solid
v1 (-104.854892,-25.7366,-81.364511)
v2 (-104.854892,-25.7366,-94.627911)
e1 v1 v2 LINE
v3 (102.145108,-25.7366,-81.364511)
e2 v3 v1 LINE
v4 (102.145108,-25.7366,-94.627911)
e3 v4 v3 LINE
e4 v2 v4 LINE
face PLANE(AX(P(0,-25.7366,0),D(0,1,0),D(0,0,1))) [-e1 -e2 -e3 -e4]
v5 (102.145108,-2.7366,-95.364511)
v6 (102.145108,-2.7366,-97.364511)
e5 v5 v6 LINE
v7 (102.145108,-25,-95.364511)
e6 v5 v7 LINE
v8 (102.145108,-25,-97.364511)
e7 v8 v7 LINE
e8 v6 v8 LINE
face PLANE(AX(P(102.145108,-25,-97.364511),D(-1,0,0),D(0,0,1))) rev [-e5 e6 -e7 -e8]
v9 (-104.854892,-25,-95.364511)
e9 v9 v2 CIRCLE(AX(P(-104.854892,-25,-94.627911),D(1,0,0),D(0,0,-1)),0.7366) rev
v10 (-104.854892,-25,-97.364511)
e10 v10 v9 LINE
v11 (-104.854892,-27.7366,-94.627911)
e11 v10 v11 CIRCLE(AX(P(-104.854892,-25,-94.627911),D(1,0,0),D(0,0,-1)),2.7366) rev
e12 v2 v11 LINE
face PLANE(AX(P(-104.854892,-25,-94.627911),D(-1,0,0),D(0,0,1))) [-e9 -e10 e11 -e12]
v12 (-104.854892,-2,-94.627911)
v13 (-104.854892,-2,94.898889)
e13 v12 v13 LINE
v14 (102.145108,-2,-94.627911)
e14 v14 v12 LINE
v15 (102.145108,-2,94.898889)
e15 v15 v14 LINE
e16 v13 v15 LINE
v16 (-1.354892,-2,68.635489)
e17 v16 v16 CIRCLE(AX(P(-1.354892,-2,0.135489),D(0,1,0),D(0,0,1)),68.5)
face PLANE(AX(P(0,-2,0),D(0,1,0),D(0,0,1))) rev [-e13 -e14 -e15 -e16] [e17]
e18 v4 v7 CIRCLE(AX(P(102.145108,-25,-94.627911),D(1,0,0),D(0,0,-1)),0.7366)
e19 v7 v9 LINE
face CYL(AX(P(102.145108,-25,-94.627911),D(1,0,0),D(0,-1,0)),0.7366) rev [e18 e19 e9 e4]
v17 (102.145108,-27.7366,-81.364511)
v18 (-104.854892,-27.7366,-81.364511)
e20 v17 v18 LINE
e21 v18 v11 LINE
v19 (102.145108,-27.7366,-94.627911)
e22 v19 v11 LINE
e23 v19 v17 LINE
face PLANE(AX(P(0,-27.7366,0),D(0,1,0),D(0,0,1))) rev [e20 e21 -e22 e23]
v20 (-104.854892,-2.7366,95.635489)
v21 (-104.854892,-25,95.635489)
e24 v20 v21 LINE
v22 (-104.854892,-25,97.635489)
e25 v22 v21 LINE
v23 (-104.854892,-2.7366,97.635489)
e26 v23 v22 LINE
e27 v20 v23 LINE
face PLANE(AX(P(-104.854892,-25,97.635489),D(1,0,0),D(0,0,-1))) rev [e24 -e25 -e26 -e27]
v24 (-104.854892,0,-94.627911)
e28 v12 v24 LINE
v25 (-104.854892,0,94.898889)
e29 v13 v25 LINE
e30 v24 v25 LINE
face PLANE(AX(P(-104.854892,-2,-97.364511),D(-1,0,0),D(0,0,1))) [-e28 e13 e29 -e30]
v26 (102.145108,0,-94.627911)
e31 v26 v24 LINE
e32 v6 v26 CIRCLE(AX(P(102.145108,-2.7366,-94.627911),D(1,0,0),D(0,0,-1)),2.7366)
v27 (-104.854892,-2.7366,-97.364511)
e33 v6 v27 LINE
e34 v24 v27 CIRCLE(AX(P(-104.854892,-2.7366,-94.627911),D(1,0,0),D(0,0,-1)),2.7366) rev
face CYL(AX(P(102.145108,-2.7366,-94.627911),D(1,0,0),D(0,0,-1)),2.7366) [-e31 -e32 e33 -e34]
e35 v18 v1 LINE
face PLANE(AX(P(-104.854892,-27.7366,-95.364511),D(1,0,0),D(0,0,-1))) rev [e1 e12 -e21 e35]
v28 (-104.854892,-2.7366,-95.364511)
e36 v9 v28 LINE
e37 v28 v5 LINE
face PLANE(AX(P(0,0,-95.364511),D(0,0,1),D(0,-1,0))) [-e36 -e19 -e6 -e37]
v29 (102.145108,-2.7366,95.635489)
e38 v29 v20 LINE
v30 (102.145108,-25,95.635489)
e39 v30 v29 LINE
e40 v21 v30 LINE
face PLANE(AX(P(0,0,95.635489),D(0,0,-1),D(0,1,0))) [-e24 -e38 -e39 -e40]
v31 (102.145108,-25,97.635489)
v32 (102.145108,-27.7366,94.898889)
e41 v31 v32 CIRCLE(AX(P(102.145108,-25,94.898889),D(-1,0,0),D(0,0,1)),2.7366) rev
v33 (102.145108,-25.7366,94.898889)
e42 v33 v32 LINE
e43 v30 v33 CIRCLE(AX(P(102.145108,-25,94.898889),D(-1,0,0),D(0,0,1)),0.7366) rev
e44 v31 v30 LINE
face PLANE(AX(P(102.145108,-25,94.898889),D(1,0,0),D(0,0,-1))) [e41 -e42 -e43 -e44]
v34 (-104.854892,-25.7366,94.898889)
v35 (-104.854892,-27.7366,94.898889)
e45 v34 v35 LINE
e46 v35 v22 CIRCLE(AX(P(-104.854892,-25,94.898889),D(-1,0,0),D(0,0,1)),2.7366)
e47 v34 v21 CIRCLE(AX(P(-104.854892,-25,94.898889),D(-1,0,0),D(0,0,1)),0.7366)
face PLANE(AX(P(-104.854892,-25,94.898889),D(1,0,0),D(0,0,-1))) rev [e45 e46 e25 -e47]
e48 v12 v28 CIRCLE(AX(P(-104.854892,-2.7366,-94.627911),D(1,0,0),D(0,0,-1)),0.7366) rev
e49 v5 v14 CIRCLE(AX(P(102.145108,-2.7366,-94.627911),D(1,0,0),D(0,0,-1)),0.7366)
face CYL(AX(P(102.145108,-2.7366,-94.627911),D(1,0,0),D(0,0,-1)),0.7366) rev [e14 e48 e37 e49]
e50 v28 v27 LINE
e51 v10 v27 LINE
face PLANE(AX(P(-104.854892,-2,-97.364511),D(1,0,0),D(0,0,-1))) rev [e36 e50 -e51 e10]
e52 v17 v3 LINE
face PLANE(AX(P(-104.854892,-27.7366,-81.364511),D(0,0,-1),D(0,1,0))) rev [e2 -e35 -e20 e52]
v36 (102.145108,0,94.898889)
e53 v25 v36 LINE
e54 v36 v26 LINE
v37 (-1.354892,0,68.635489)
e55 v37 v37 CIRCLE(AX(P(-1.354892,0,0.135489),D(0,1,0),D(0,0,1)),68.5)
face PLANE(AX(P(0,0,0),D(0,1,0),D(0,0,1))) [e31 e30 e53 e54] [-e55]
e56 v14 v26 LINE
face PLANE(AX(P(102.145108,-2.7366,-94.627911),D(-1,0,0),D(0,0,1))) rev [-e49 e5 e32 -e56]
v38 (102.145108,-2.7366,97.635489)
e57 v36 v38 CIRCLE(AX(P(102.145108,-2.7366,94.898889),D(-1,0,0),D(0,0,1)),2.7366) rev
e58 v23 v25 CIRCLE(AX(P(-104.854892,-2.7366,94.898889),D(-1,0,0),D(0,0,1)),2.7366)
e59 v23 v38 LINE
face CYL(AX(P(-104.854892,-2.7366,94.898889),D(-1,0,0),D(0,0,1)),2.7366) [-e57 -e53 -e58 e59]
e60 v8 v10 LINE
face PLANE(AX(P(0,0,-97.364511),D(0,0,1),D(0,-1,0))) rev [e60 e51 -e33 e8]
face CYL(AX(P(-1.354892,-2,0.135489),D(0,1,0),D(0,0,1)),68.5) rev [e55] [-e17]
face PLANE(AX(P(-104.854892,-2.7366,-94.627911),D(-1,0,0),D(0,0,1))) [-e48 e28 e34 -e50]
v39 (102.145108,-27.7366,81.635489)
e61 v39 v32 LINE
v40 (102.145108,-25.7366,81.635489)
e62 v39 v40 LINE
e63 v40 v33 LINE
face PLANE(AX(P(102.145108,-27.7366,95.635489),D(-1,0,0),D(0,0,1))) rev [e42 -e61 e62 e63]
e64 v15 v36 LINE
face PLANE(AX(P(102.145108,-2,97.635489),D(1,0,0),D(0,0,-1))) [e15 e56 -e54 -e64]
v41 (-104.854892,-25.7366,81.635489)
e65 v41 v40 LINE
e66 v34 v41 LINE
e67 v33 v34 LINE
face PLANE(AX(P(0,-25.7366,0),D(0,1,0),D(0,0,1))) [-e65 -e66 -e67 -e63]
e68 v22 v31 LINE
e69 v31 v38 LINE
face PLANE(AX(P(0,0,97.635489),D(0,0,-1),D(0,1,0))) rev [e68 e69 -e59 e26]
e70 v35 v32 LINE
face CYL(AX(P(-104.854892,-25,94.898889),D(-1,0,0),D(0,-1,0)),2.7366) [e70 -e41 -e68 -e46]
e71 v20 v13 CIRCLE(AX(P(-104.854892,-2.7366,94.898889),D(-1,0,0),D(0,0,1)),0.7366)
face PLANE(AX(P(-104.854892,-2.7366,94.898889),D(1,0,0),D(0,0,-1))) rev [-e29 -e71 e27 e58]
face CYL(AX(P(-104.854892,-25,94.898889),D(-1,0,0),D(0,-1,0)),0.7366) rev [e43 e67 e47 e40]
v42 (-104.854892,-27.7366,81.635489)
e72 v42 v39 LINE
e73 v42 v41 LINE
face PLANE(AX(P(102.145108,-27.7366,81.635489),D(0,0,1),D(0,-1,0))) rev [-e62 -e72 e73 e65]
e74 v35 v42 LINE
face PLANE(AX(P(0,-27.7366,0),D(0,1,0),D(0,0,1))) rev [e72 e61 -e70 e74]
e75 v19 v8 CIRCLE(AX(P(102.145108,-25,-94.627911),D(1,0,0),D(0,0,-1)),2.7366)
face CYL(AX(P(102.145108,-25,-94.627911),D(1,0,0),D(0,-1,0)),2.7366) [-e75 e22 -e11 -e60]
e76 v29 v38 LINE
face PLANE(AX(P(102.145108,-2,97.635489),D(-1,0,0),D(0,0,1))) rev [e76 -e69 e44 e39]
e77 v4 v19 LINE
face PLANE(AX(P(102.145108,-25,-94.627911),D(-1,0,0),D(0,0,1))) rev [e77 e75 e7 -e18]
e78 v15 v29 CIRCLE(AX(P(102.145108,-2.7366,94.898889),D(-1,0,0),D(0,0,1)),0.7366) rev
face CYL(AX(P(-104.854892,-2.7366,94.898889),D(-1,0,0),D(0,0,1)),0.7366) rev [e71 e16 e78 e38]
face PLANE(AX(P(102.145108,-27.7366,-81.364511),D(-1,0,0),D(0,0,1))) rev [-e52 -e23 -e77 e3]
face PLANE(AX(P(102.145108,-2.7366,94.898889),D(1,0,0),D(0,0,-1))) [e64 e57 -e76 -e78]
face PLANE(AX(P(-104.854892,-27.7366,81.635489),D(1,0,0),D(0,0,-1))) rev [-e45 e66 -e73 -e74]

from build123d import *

# Parameters (mm, degrees)
SKETCH3_W                      = 207
SKETCH3_H                      = 195
BASE_FLANGE1_DEPTH             = 2
EDGE_FLANGE1_STRIP_W           = 9.4732
EDGE_FLANGE1_STRIP_H           = 2
EDGE_FLANGE1_STRIP_CUT_DEPTH   = 207
EDGE_FLANGE1_STRIP_2_W         = 9.4732
EDGE_FLANGE1_STRIP_2_H         = 2
EDGE_FLANGE1_STRIP_CUT_2_DEPTH = 207
EDGE_FLANGE1_DEPTH             = 207
EDGE_FLANGE1_BEND_DEPTH        = 207
SKETCH14_R                     = 68.5
CUT_EXTRUDE1_DEPTH             = 2
EDGE_FLANGE2_DEPTH             = 207
EDGE_FLANGE2_BEND_DEPTH        = 207


# Sheet-metal steps are written as plain solids
with BuildPart() as part:
    # Sketch3 → Base-Flange1 (new body)
    with BuildSketch(Plane(origin=(0, 0, 0), x_dir=(1, 0, 0), z_dir=(0, 1, 0))):
        with Locations((-1.354892482, -0.135489248)):
            Rectangle(SKETCH3_W, SKETCH3_H)
    extrude(amount=-BASE_FLANGE1_DEPTH)

    # Edge-Flange1 strip (across the edge) → Edge-Flange1 strip cut (cut)
    with BuildSketch(Plane(origin=(102.145107518, -2, 97.635489248), x_dir=(0, 0, -1), z_dir=(-1, 0, 0))):
        with Locations((-2, -1)):
            Rectangle(EDGE_FLANGE1_STRIP_W, EDGE_FLANGE1_STRIP_H)
    extrude(amount=EDGE_FLANGE1_STRIP_CUT_DEPTH, mode=Mode.SUBTRACT)

    # Edge-Flange1 strip 2 (across the edge) → Edge-Flange1 strip cut 2 (cut)
    with BuildSketch(Plane(origin=(-104.854892482, -2, -97.364510752), x_dir=(0, 0, 1), z_dir=(1, 0, 0))):
        with Locations((-2, -1)):
            Rectangle(EDGE_FLANGE1_STRIP_2_W, EDGE_FLANGE1_STRIP_2_H)
    extrude(amount=EDGE_FLANGE1_STRIP_CUT_2_DEPTH, mode=Mode.SUBTRACT)

    # Edge-Flange1 section (across the edge) → Edge-Flange1 (add)
    with BuildSketch(Plane(origin=(102.145107518, -2, 97.635489248), x_dir=(0, 0, -1), z_dir=(-1, 0, 0))):
        with BuildLine():
            Line((0, 0.7366), (0, 23))
            Line((0, 23), (2, 23))
            Line((2, 23), (2, 0.7366))
            ThreePointArc((2, 0.7366), (2.215745145, 0.215745145), (2.7366, 0))
            Line((2.7366, 0), (2.7366, -2))
            ThreePointArc((2.7366, -2), (0.801531583, -1.198468417), (0, 0.7366))
        make_face()
    extrude(amount=EDGE_FLANGE1_DEPTH)

    # Edge-Flange1 section 2 (across the edge) → Edge-Flange1 bend (add)
    with BuildSketch(Plane(origin=(-104.854892482, -2, -97.364510752), x_dir=(0, 0, 1), z_dir=(1, 0, 0))):
        with BuildLine():
            Line((0, 0.7366), (0, 23))
            Line((0, 23), (2, 23))
            Line((2, 23), (2, 0.7366))
            ThreePointArc((2, 0.7366), (2.215745145, 0.215745145), (2.7366, 0))
            Line((2.7366, 0), (2.7366, -2))
            ThreePointArc((2.7366, -2), (0.801531583, -1.198468417), (0, 0.7366))
        make_face()
    extrude(amount=EDGE_FLANGE1_BEND_DEPTH)

    # Sketch14 → Cut-Extrude1 (cut)
    with BuildSketch(Plane(origin=(0, 0, 0), x_dir=(1, 0, 0), z_dir=(0, 1, 0))):
        with Locations(Location((-1.354892482, -0.135489248, 0), (0, 0, 270))):
            Circle(SKETCH14_R)
    extrude(amount=-CUT_EXTRUDE1_DEPTH, mode=Mode.SUBTRACT)

    # Edge-Flange2 section (across the edge) → Edge-Flange2 (add)
    with BuildSketch(Plane(origin=(102.145107518, -25.7366, 95.635489248), x_dir=(0, 1, 0), z_dir=(-1, 0, 0))):
        with BuildLine():
            Line((-2, 0.7366), (-2, 14))
            Line((-2, 14), (0, 14))
            Line((0, 14), (0, 0.7366))
            ThreePointArc((0, 0.7366), (0.215745145, 0.215745145), (0.7366, 0))
            Line((0.7366, 0), (0.7366, -2))
            ThreePointArc((0.7366, -2), (-1.198468417, -1.198468417), (-2, 0.7366))
        make_face()
    extrude(amount=EDGE_FLANGE2_DEPTH)

    # Edge-Flange2 section 2 (across the edge) → Edge-Flange2 bend (add)
    with BuildSketch(Plane(origin=(-104.854892482, -25.7366, -95.364510752), x_dir=(0, 1, 0), z_dir=(1, 0, 0))):
        with BuildLine():
            Line((-2, 0.7366), (-2, 14))
            Line((-2, 14), (0, 14))
            Line((0, 14), (0, 0.7366))
            ThreePointArc((0, 0.7366), (0.215745145, 0.215745145), (0.7366, 0))
            Line((0.7366, 0), (0.7366, -2))
            ThreePointArc((0.7366, -2), (-1.198468417, -1.198468417), (-2, 0.7366))
        make_face()
    extrude(amount=EDGE_FLANGE2_BEND_DEPTH)


solid = part.part
